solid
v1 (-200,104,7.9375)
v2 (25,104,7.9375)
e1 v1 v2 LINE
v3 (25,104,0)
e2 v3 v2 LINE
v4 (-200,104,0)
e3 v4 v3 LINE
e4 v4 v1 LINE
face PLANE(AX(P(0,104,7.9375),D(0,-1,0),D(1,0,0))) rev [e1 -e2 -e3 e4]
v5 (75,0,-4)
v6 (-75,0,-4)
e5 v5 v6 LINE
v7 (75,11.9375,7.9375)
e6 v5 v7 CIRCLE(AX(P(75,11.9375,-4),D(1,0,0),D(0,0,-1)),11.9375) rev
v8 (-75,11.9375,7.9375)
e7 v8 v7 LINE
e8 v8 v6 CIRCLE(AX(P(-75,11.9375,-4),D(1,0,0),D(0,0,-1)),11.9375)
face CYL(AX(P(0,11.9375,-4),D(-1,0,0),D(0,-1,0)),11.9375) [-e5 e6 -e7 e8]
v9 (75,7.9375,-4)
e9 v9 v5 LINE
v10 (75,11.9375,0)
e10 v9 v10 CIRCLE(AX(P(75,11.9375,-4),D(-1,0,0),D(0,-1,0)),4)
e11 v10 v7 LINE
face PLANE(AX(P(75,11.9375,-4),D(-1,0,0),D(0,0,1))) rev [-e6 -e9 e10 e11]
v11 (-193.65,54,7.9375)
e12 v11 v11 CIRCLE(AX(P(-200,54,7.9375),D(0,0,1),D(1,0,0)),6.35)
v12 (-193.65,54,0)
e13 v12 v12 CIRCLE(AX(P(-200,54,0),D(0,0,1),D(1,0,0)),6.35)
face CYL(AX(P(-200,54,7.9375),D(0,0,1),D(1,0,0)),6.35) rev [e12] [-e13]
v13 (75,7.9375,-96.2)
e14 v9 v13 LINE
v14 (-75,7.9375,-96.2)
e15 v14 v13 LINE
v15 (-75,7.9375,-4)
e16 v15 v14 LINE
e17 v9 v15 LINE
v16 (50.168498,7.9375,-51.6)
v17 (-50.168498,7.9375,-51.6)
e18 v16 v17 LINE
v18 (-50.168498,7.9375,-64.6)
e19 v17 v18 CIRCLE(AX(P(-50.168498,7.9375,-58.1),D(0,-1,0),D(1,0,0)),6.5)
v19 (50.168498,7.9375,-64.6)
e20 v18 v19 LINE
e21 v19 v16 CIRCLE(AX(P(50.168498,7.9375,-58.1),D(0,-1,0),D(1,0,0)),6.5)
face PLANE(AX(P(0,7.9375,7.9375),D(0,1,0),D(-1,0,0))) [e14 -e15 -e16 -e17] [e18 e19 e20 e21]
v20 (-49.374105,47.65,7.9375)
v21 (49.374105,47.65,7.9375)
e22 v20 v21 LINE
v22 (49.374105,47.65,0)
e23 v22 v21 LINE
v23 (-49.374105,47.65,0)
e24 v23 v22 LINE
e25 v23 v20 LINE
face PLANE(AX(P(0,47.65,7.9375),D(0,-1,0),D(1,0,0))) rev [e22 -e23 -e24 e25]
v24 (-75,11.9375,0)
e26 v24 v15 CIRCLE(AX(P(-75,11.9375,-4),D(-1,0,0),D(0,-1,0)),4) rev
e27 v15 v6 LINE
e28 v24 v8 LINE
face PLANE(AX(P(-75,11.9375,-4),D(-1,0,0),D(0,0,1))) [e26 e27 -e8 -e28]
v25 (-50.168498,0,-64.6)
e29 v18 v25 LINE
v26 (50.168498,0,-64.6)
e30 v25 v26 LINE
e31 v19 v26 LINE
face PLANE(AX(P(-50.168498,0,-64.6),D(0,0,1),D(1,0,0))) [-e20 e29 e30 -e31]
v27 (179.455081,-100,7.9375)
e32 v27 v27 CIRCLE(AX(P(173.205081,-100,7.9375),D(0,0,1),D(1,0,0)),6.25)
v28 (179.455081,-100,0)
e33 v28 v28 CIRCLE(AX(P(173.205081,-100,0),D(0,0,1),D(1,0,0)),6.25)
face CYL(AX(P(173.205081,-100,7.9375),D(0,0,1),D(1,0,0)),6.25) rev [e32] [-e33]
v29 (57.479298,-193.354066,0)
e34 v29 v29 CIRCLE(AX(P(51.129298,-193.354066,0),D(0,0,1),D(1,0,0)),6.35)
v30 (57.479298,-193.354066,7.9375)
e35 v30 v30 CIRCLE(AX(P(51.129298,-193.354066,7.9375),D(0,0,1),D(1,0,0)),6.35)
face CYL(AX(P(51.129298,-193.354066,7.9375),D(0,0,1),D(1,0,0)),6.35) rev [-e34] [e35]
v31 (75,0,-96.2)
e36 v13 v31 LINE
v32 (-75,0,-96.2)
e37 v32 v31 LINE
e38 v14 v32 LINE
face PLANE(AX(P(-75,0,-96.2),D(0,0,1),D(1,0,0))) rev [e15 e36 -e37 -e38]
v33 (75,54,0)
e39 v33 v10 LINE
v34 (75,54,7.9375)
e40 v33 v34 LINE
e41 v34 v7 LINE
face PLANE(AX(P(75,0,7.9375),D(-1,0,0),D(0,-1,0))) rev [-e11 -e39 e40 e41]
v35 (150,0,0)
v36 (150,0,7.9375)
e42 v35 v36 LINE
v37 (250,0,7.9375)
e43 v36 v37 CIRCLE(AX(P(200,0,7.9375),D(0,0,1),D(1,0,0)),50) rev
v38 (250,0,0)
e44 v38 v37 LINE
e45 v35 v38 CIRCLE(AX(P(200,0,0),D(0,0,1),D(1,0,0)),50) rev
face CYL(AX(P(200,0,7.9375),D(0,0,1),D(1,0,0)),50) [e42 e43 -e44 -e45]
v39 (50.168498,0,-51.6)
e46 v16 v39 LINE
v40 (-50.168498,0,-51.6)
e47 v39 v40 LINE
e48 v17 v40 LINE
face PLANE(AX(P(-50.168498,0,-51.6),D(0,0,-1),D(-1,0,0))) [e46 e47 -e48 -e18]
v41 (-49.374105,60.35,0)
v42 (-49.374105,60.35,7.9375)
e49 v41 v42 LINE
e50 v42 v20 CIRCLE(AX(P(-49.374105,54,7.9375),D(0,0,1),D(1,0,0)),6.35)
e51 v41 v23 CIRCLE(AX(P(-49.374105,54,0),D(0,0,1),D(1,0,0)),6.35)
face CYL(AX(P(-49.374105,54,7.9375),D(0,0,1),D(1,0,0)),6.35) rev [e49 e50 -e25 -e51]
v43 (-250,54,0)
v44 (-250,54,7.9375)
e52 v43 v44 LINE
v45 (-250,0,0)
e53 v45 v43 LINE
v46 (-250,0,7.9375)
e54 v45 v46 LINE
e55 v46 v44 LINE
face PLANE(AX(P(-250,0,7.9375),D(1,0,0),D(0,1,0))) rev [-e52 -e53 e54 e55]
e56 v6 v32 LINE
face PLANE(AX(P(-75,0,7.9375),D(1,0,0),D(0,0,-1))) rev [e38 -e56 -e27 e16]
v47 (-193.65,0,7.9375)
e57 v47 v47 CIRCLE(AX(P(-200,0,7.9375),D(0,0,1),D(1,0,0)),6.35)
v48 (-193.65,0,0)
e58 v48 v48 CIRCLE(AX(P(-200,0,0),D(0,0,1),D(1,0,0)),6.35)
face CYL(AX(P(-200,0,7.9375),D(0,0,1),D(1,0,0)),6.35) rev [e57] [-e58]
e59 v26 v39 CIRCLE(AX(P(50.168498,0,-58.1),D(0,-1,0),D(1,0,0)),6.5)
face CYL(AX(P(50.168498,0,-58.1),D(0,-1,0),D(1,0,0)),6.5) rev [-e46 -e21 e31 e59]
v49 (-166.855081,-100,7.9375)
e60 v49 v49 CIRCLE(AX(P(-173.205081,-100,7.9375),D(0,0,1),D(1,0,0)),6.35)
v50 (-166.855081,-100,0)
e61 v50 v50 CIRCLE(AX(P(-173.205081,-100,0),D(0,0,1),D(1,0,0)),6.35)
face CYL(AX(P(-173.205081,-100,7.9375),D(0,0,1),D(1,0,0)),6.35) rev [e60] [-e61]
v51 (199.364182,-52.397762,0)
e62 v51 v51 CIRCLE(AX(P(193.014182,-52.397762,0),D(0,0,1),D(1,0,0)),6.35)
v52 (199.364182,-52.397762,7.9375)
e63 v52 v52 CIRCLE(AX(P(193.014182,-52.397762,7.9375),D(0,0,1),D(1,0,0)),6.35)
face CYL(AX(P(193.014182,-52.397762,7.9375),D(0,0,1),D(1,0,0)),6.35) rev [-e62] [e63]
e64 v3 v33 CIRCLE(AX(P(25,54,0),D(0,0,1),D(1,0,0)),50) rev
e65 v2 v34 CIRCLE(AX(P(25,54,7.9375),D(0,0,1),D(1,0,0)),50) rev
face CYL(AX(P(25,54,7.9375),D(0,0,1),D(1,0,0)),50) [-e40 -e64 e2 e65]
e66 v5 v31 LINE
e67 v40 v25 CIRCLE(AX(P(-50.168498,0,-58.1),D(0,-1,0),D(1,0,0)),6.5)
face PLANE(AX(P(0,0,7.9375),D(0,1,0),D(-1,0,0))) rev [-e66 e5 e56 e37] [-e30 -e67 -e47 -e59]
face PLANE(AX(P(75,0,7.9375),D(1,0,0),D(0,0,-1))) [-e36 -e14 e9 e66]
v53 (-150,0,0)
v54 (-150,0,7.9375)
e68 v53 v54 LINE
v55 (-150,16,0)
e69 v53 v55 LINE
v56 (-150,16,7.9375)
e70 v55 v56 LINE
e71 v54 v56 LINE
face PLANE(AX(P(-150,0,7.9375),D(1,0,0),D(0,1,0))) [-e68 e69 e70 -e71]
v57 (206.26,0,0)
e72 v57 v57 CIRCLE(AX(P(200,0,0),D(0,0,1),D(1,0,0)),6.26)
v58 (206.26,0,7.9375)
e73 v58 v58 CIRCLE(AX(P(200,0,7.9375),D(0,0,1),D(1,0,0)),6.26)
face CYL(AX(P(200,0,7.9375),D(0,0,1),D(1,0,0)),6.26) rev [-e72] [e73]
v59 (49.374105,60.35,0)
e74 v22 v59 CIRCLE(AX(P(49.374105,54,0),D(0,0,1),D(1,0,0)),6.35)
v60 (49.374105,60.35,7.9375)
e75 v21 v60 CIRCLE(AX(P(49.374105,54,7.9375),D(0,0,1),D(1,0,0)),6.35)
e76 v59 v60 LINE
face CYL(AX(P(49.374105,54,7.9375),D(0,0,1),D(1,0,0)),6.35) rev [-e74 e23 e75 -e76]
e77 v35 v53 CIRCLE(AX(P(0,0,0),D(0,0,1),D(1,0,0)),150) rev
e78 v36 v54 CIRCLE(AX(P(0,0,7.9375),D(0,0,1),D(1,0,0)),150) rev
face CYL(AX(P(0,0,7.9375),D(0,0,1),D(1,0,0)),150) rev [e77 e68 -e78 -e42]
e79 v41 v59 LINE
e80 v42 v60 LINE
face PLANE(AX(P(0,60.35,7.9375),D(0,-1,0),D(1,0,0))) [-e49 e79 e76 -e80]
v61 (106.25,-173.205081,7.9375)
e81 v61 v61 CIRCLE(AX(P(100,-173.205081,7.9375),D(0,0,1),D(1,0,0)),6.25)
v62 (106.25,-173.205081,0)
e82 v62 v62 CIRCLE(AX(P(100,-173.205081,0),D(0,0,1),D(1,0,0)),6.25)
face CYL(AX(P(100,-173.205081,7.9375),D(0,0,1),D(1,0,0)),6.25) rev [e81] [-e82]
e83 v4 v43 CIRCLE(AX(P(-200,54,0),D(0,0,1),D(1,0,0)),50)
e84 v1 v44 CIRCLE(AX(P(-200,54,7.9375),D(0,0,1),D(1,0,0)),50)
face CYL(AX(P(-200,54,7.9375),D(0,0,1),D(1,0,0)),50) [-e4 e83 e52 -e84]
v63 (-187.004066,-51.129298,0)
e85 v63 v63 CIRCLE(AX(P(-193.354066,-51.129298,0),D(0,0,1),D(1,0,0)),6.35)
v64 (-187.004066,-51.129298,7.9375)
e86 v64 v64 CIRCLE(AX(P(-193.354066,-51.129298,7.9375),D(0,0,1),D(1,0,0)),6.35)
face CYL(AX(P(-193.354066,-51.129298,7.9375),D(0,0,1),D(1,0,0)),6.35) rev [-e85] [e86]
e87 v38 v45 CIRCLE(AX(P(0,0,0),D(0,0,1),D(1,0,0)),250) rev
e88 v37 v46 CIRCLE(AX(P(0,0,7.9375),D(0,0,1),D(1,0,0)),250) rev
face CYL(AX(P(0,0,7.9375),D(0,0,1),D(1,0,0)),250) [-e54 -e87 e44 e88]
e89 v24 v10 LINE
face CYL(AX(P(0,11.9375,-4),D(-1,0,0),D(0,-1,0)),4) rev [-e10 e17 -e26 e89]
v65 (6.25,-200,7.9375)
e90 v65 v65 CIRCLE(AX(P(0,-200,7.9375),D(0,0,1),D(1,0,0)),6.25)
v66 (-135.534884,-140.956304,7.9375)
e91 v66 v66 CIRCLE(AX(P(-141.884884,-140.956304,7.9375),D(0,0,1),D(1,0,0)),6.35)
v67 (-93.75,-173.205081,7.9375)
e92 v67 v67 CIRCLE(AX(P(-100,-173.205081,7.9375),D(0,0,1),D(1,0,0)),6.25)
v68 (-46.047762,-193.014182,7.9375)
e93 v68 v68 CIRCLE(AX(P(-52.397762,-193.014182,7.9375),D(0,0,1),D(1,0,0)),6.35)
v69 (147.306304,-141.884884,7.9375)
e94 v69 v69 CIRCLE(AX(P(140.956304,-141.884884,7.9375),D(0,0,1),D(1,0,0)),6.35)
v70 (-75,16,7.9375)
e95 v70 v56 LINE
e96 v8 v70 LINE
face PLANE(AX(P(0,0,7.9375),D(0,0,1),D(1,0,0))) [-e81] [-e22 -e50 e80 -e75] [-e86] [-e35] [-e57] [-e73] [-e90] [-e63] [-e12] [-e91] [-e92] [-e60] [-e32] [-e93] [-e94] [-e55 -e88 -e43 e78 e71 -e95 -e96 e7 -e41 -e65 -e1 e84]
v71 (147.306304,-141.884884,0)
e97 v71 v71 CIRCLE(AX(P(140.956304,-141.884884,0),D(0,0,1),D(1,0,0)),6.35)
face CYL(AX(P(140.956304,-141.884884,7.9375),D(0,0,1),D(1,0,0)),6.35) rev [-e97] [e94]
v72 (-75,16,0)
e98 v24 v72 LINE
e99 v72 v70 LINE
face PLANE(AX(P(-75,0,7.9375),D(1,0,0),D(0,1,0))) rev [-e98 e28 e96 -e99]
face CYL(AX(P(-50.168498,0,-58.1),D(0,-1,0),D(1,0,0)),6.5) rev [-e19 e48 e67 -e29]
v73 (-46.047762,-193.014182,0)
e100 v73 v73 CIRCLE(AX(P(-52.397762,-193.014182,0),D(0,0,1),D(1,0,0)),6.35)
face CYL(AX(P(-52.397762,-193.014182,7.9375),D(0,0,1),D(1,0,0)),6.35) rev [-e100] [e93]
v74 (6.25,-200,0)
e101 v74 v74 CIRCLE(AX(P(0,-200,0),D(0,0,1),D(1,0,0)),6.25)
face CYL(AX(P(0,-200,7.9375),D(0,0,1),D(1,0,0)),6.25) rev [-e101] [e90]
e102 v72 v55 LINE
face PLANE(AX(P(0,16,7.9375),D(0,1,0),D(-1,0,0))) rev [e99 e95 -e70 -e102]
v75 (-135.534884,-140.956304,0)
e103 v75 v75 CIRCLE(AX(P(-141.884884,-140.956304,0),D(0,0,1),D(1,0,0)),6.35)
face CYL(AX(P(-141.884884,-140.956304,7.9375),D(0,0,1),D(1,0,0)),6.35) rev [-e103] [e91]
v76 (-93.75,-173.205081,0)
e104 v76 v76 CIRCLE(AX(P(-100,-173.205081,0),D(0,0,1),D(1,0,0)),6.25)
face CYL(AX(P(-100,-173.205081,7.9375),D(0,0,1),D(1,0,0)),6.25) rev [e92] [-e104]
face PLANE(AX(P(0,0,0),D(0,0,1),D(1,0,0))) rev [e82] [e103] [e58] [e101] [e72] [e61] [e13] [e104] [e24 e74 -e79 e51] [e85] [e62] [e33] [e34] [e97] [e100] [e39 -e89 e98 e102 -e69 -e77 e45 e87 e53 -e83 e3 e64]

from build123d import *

# Parameters (mm, degrees)
CROQUIS1_R                = 6.35
CROQUIS1_R_2              = 6.26
CROQUIS1_R_3              = 6.25
SALIENTE_EXTRUIR1_DEPTH   = 7.9375
CROQUIS2_W                = 150
CROQUIS2_H                = 104.1375
SALIENTE_EXTRUIR2_DEPTH   = 7.9375
CONVERTIR_S_LIDO1_START   = -75
CONVERTIR_S_LIDO1_DEPTH   = 150
CONVERTIR_S_LIDO1_2_DEPTH = 150


# Read off the part's stored shape, not the designer's step: Convertir-Sólido1
with BuildPart() as part:
    # Croquis1 → Saliente-Extruir1 (new body)
    with BuildSketch(Plane.XY):
        with BuildLine():
            Line((-75, 16), (-75, 0))
            Line((-75, 0), (75, 0))
            Line((75, 0), (75, 54))
            ThreePointArc((75, 54), (60.355339059, 89.355339059), (25, 104))
            Line((25, 104), (-200, 104))
            ThreePointArc((-200, 104), (-235.355339059, 89.355339059), (-250, 54))
            Line((-250, 54), (-250, 0))
            ThreePointArc((-250, 0), (0, -250), (250, 0))
            ThreePointArc((250, 0), (200, 50), (150, 0))
            ThreePointArc((150, 0), (0, -150), (-150, 0))
            Line((-150, 0), (-150, 16))
            Line((-150, 16), (-75, 16))
        make_face()
        with BuildLine():
            ThreePointArc((-49.374105038, 47.65), (-55.724105038, 54), (-49.374105038, 60.35))
            Line((-49.374105038, 60.35), (49.374105038, 60.35))
            ThreePointArc((49.374105038, 60.35), (55.724105038, 54), (49.374105038, 47.65))
            Line((49.374105038, 47.65), (-49.374105038, 47.65))
        make_face(mode=Mode.SUBTRACT)
        with Locations((193.014182094, -52.397762459)):
            Circle(CROQUIS1_R, mode=Mode.SUBTRACT)
        with Locations((200, 0)):
            Circle(CROQUIS1_R_2, mode=Mode.SUBTRACT)
        with Locations((-100, -173.205080757)):
            Circle(CROQUIS1_R_3, mode=Mode.SUBTRACT)
        with Locations((-52.397762459, -193.014182094)):
            Circle(CROQUIS1_R, mode=Mode.SUBTRACT)
        with Locations((-141.884884438, -140.956303754)):
            Circle(CROQUIS1_R, mode=Mode.SUBTRACT)
        with Locations((-173.205080757, -100)):
            Circle(CROQUIS1_R, mode=Mode.SUBTRACT)
        with Locations((0, -200)):
            Circle(CROQUIS1_R_3, mode=Mode.SUBTRACT)
        with Locations((51.129297656, -193.354066213)):
            Circle(CROQUIS1_R, mode=Mode.SUBTRACT)
        with Locations((100, -173.205080757)):
            Circle(CROQUIS1_R_3, mode=Mode.SUBTRACT)
        with Locations((140.956303754, -141.884884438)):
            Circle(CROQUIS1_R, mode=Mode.SUBTRACT)
        with Locations((173.205080757, -100)):
            Circle(CROQUIS1_R_3, mode=Mode.SUBTRACT)
        with Locations((-193.354066213, -51.129297656)):
            Circle(CROQUIS1_R, mode=Mode.SUBTRACT)
        with Locations((-200, 0)):
            Circle(CROQUIS1_R, mode=Mode.SUBTRACT)
        with Locations((-200, 54)):
            Circle(CROQUIS1_R, mode=Mode.SUBTRACT)
    extrude(amount=SALIENTE_EXTRUIR1_DEPTH)

    # Croquis2 → Saliente-Extruir2 (add)
    with BuildSketch(Plane.XZ):
        with Locations((0, -44.13125)):
            Rectangle(CROQUIS2_W, CROQUIS2_H)
        with BuildLine():
            Line((-50.16849794, -51.6), (50.16849794, -51.6))
            ThreePointArc((50.16849794, -51.6), (56.66849794, -58.1), (50.16849794, -64.6))
            Line((50.16849794, -64.6), (-50.16849794, -64.6))
            ThreePointArc((-50.16849794, -64.6), (-56.66849794, -58.1), (-50.16849794, -51.6))
        make_face(mode=Mode.SUBTRACT)
    extrude(amount=-SALIENTE_EXTRUIR2_DEPTH)

    # Convertir-Sólido1 outline → Convertir-Sólido1 (cut)
    with BuildSketch(Plane.YZ.offset(CONVERTIR_S_LIDO1_START)):
        with BuildLine():
            ThreePointArc((0, -4), (3.4964128, 4.4410872), (11.9375, 7.9375))
            Line((11.9375, 7.9375), (0, 7.9375))
            Line((0, 7.9375), (0, -4))
        make_face()
    extrude(amount=CONVERTIR_S_LIDO1_DEPTH, mode=Mode.SUBTRACT)

    # Convertir-S_lido1 2 outline → Convertir-S_lido1 2 (add)
    with BuildSketch(Plane.YZ.offset(CONVERTIR_S_LIDO1_START)):
        with BuildLine():
            Line((11.9375, 0), (7.9375, 0))
            Line((7.9375, 0), (7.9375, -4))
            ThreePointArc((7.9375, -4), (9.109072875, -1.171572875), (11.9375, 0))
        make_face()
    extrude(amount=CONVERTIR_S_LIDO1_2_DEPTH)


solid = part.part
